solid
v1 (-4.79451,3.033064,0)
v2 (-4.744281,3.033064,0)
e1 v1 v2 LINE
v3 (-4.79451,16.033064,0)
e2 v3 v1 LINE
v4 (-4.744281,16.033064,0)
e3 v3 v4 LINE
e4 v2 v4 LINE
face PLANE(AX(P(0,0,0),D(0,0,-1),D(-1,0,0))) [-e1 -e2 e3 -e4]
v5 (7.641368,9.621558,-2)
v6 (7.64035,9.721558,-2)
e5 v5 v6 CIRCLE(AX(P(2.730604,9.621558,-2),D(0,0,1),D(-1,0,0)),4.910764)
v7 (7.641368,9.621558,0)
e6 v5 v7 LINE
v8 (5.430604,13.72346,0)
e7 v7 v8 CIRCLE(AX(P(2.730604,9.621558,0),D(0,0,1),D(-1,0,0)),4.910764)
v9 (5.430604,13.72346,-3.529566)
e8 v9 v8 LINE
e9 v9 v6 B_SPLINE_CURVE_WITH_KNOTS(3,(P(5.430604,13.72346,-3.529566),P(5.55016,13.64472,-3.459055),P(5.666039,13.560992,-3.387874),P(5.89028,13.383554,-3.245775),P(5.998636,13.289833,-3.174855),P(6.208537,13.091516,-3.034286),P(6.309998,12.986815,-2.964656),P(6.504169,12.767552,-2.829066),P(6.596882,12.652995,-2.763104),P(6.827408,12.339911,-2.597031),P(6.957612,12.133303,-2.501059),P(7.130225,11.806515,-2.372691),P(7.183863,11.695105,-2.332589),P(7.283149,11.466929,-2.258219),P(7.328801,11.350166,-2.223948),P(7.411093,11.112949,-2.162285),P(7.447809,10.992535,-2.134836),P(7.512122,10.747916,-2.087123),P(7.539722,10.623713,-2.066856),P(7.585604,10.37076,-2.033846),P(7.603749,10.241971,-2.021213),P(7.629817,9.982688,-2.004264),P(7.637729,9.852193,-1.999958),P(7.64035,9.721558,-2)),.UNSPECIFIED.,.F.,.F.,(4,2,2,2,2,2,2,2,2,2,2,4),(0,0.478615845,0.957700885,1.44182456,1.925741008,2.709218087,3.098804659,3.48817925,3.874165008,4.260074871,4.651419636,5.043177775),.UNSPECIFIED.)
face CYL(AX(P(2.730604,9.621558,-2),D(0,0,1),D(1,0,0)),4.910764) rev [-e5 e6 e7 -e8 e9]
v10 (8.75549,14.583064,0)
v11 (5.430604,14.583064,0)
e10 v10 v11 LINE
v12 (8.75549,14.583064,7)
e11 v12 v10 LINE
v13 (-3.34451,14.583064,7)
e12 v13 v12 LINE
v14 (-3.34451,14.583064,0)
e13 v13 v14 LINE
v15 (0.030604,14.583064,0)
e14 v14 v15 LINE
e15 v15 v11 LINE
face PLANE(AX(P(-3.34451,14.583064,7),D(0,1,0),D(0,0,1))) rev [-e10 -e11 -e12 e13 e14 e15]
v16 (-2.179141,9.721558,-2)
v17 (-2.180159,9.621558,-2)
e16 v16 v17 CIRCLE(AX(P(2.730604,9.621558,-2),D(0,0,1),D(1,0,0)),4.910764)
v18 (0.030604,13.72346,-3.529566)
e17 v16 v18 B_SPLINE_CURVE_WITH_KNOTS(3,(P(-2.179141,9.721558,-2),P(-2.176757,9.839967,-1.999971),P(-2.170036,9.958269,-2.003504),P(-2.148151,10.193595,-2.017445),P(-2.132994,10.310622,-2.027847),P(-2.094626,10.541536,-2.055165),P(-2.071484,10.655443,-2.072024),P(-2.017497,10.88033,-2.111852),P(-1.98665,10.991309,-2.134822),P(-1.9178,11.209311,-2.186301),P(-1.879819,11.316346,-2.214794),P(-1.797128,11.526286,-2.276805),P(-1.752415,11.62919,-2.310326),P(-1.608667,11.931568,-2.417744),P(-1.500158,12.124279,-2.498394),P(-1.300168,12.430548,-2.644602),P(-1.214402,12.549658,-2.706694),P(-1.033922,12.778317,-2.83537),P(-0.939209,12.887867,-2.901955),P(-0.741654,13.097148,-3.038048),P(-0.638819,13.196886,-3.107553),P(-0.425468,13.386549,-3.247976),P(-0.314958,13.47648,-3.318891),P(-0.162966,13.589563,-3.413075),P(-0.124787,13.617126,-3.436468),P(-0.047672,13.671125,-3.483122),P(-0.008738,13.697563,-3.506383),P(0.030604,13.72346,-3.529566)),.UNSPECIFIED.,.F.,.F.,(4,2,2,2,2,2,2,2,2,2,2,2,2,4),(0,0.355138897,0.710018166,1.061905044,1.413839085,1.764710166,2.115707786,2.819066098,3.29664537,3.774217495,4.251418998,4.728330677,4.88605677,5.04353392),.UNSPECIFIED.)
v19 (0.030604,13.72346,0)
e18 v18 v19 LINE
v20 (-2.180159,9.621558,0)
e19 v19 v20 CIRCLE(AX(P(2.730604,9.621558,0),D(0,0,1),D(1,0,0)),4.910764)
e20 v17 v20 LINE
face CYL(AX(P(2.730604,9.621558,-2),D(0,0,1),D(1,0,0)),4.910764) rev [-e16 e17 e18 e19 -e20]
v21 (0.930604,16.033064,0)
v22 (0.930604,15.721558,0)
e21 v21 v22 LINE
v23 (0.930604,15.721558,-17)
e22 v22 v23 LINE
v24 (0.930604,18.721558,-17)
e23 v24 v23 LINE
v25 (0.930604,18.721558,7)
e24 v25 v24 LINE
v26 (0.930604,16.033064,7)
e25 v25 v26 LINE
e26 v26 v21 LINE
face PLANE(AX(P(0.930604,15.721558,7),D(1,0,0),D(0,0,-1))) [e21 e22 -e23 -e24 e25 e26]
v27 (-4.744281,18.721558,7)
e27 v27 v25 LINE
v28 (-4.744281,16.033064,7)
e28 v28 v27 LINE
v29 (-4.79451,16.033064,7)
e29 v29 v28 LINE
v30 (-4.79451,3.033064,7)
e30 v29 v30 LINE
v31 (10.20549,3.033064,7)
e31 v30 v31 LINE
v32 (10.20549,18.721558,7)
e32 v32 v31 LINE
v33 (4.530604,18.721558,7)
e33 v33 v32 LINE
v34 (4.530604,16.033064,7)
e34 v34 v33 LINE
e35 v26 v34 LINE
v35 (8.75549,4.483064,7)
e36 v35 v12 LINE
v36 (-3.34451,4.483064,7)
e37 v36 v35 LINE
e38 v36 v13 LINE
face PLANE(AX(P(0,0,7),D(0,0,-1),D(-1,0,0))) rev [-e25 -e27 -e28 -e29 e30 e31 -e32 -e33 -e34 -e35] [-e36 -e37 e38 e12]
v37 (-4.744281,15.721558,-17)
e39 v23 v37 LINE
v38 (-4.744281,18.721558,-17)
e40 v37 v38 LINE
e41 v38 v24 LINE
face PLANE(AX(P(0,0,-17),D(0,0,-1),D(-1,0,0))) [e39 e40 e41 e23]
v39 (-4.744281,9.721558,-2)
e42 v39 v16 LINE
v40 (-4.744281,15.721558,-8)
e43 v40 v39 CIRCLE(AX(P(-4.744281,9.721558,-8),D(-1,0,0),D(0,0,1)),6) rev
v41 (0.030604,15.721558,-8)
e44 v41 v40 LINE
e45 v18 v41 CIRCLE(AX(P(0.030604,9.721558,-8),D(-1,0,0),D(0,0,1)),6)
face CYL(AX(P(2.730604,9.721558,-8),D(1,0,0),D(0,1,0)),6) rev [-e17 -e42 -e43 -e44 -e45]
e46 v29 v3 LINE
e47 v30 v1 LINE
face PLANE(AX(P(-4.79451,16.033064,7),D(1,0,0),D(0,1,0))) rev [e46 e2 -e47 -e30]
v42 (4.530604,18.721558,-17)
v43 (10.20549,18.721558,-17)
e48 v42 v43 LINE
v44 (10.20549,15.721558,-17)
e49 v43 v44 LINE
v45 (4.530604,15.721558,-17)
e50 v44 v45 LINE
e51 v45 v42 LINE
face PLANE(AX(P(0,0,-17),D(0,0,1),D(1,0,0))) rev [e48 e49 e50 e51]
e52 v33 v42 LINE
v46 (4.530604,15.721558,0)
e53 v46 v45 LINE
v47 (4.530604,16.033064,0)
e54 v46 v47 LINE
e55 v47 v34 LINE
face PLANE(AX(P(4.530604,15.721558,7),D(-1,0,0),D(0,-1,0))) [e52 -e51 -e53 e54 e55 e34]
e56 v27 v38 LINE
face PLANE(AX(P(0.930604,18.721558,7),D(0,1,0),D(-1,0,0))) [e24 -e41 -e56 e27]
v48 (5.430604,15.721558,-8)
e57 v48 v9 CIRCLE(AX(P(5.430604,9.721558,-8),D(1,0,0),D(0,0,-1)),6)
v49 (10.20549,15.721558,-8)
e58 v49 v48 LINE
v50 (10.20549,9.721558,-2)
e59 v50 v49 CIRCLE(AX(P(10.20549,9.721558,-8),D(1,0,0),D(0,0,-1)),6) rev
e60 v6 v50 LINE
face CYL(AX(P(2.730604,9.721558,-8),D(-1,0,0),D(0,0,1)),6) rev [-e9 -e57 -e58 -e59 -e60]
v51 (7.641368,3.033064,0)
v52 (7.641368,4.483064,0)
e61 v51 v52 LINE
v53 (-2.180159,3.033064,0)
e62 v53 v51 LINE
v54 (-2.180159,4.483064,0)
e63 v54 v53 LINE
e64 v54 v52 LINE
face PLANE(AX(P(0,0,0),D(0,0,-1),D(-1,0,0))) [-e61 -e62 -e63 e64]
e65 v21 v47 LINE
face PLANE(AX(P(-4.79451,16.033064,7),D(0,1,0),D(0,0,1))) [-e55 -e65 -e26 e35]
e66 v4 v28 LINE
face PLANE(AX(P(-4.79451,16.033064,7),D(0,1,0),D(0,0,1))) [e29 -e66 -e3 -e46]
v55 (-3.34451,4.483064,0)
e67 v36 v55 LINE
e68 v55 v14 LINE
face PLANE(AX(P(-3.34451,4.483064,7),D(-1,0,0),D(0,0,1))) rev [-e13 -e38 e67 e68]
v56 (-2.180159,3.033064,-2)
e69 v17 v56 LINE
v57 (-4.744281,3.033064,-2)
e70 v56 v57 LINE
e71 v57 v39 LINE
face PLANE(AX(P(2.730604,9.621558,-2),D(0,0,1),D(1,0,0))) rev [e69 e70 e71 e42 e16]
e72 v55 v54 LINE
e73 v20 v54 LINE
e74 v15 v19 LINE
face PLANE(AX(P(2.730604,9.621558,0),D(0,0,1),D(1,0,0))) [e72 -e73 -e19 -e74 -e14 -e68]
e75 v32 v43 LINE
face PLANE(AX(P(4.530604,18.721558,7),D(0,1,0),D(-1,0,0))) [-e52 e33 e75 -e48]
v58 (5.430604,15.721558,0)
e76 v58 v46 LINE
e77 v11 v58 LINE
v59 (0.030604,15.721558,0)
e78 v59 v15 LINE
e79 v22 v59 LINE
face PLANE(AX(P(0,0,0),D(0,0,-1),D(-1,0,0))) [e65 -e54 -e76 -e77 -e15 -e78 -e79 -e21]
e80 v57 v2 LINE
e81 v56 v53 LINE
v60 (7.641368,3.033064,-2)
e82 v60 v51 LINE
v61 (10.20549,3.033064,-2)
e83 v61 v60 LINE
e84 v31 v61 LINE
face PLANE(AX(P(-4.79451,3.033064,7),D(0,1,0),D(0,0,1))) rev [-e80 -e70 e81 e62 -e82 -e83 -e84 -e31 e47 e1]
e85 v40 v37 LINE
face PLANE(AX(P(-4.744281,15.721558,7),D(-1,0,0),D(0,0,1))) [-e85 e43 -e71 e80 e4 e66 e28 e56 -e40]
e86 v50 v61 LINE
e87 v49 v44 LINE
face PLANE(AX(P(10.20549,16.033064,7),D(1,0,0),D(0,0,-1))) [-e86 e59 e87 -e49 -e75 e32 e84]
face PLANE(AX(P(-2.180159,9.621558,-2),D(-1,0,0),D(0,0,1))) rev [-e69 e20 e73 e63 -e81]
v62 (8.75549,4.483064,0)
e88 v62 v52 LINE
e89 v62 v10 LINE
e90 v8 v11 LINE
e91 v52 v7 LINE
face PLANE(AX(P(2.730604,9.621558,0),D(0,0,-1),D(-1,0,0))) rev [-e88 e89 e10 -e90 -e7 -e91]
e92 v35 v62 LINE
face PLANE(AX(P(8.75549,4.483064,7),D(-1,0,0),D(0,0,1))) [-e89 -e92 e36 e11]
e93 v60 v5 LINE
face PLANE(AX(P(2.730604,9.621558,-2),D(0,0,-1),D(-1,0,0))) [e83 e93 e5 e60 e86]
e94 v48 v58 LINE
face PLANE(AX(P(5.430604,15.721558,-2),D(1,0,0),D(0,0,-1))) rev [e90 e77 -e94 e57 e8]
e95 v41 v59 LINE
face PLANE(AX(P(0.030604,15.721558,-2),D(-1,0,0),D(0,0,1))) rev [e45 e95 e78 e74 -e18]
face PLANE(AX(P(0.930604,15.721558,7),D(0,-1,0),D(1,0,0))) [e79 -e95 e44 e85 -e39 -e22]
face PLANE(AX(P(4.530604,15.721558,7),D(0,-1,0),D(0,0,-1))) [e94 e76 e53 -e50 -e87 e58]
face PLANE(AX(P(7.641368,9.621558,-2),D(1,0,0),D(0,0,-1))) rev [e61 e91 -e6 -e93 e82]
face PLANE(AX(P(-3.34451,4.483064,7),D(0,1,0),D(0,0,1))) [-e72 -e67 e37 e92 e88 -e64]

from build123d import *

# Parameters (mm, degrees)
SKETCH1_W                = 15
SKETCH1_H                = 13
SKETCH1_W_2              = 12.1
SKETCH1_H_2              = 10.1
BOSS_EXTRUDE1_DEPTH      = 7
BOSS_EXTRUDE2_DEPTH      = 17
BOSS_EXTRUDE2_DEPTH_BACK = 7
SKETCH2_W                = 5.674885541
SKETCH2_H                = 3
BOSS_EXTRUDE3_DEPTH      = 2
FILLET1_START            = -4.744281145
FILLET1_DEPTH            = 3.685449278
FILLET1_START_2          = 7.64136832
FILLET1_2_DEPTH          = 2.564121617
FILLET1_START_3          = 5.430604396
FILLET1_3_DEPTH          = 2.210763824
FILLET1_START_4          = -1.058831867
FILLET1_4_DEPTH          = 1.089436263
FILLET1_START_5          = -8
FILLET1_5_DEPTH          = 6


with BuildPart() as part:
    # Sketch1 → Boss-Extrude1 (new body)
    with BuildSketch(Plane.XY):
        with Locations((2.705489937, 9.533064254)):
            Rectangle(SKETCH1_W, SKETCH1_H)
        with Locations((2.705489937, 9.533064254)):
            Rectangle(SKETCH1_W_2, SKETCH1_H_2, mode=Mode.SUBTRACT)
    extrude(amount=BOSS_EXTRUDE1_DEPTH)

    # Sketch2 → Boss-Extrude2 (add, two sides: drawn at the far end of the back side and taken through both)
    with BuildSketch(Plane(origin=(0, 0, 0), x_dir=(-1, 0, 0), z_dir=(0, 0, -1)).offset(-BOSS_EXTRUDE2_DEPTH_BACK)):
        with Locations((-7.368047167, 17.22155756)):
            Rectangle(SKETCH2_W, SKETCH2_H)
        with Locations((1.906838375, 17.22155756)):
            Rectangle(SKETCH2_W, SKETCH2_H)
    extrude(amount=BOSS_EXTRUDE2_DEPTH + BOSS_EXTRUDE2_DEPTH_BACK)

    # Sketch3 → Boss-Extrude3 (add)
    with BuildSketch(Plane(origin=(0, 0, 0), x_dir=(-1, 0, 0), z_dir=(0, 0, -1))):
        with BuildLine():
            Line((-10.205489937, 15.72155756), (-5.430604396, 15.72155756))
            Line((-5.430604396, 15.72155756), (-5.430604396, 13.72345972))
            ThreePointArc((-5.430604396, 13.72345972), (-7.053489061, 11.951422257), (-7.64136822, 9.62155756))
            Line((-7.64136822, 9.62155756), (-7.64136822, 3.033064254))
            Line((-7.64136822, 3.033064254), (-10.205489937, 3.033064254))
            Line((-10.205489937, 3.033064254), (-10.205489937, 9.62155756))
            Line((-10.205489937, 9.62155756), (-10.205489937, 13.72345972))
            Line((-10.205489937, 13.72345972), (-10.205489937, 15.72155756))
        make_face()
        with BuildLine():
            Line((4.744281145, 15.72155756), (4.744281145, 13.72345972))
            Line((4.744281145, 13.72345972), (4.744281145, 9.62155756))
            Line((4.744281145, 9.62155756), (4.744281145, 3.033064254))
            Line((4.744281145, 3.033064254), (2.180159427, 3.033064254))
            Line((2.180159427, 3.033064254), (2.180159427, 9.62155756))
            ThreePointArc((2.180159427, 9.62155756), (1.592280269, 11.951422257), (-0.030604396, 13.72345972))
            Line((-0.030604396, 13.72345972), (-0.030604396, 15.72155756))
            Line((-0.030604396, 15.72155756), (4.744281145, 15.72155756))
        make_face()
    extrude(amount=BOSS_EXTRUDE3_DEPTH)

    # Fillet1: read off the stored shape, not the designer's step
    # Fillet1 outline → Fillet1 (add)
    with BuildSketch(Plane.YZ.offset(FILLET1_START)):
        with BuildLine():
            ThreePointArc((9.72155756, -2), (13.964198247, -3.757359313), (15.72155756, -8))
            Line((15.72155756, -8), (15.72155756, -2))
            Line((15.72155756, -2), (9.72155756, -2))
        make_face()
    extrude(amount=FILLET1_DEPTH)

    # Fillet1 2 outline → Fillet1 2 (add)
    with BuildSketch(Plane.YZ.offset(FILLET1_START_2)):
        with BuildLine():
            ThreePointArc((9.72155756, -2), (13.964198247, -3.757359313), (15.72155756, -8))
            Line((15.72155756, -8), (15.72155756, -2))
            Line((15.72155756, -2), (9.72155756, -2))
        make_face()
    extrude(amount=FILLET1_2_DEPTH)

    # Fillet1 3 outline → Fillet1 3 (add)
    with BuildSketch(Plane.YZ.offset(FILLET1_START_3)):
        with BuildLine():
            ThreePointArc((9.72155756, -2), (13.964198247, -3.757359313), (15.72155756, -8))
            Line((15.72155756, -8), (15.72155756, -2))
            Line((15.72155756, -2), (9.72155756, -2))
        make_face()
    extrude(amount=FILLET1_3_DEPTH)

    # Fillet1 4 outline → Fillet1 4 (add)
    with BuildSketch(Plane.YZ.offset(FILLET1_START_4)):
        with BuildLine():
            ThreePointArc((9.72155756, -2), (13.964198247, -3.757359313), (15.72155756, -8))
            Line((15.72155756, -8), (15.72155756, -2))
            Line((15.72155756, -2), (9.72155756, -2))
        make_face()
    extrude(amount=FILLET1_4_DEPTH)

    # Fillet1 5 outline → Fillet1 5 (cut)
    with BuildSketch(Plane.XY.offset(FILLET1_START_5)):
        with BuildLine():
            Line((7.64136822, 8), (7.64136822, 9.62155756))
            ThreePointArc((7.64136822, 9.62155756), (7.053489061, 11.951422256), (5.430604396, 13.72345972))
            Line((5.430604396, 13.72345972), (5.430604396, 8))
            Line((5.430604396, 8), (7.64136822, 8))
        make_face()
        with BuildLine():
            Line((-2.180159426, 8), (0.030604396, 8))
            Line((0.030604396, 8), (0.030604396, 13.72345972))
            ThreePointArc((0.030604396, 13.72345972), (-1.592280269, 11.951422257), (-2.180159427, 9.62155756))
            Line((-2.180159427, 9.62155756), (-2.180159426, 8))
        make_face()
    extrude(amount=FILLET1_5_DEPTH, mode=Mode.SUBTRACT)


solid = part.part
